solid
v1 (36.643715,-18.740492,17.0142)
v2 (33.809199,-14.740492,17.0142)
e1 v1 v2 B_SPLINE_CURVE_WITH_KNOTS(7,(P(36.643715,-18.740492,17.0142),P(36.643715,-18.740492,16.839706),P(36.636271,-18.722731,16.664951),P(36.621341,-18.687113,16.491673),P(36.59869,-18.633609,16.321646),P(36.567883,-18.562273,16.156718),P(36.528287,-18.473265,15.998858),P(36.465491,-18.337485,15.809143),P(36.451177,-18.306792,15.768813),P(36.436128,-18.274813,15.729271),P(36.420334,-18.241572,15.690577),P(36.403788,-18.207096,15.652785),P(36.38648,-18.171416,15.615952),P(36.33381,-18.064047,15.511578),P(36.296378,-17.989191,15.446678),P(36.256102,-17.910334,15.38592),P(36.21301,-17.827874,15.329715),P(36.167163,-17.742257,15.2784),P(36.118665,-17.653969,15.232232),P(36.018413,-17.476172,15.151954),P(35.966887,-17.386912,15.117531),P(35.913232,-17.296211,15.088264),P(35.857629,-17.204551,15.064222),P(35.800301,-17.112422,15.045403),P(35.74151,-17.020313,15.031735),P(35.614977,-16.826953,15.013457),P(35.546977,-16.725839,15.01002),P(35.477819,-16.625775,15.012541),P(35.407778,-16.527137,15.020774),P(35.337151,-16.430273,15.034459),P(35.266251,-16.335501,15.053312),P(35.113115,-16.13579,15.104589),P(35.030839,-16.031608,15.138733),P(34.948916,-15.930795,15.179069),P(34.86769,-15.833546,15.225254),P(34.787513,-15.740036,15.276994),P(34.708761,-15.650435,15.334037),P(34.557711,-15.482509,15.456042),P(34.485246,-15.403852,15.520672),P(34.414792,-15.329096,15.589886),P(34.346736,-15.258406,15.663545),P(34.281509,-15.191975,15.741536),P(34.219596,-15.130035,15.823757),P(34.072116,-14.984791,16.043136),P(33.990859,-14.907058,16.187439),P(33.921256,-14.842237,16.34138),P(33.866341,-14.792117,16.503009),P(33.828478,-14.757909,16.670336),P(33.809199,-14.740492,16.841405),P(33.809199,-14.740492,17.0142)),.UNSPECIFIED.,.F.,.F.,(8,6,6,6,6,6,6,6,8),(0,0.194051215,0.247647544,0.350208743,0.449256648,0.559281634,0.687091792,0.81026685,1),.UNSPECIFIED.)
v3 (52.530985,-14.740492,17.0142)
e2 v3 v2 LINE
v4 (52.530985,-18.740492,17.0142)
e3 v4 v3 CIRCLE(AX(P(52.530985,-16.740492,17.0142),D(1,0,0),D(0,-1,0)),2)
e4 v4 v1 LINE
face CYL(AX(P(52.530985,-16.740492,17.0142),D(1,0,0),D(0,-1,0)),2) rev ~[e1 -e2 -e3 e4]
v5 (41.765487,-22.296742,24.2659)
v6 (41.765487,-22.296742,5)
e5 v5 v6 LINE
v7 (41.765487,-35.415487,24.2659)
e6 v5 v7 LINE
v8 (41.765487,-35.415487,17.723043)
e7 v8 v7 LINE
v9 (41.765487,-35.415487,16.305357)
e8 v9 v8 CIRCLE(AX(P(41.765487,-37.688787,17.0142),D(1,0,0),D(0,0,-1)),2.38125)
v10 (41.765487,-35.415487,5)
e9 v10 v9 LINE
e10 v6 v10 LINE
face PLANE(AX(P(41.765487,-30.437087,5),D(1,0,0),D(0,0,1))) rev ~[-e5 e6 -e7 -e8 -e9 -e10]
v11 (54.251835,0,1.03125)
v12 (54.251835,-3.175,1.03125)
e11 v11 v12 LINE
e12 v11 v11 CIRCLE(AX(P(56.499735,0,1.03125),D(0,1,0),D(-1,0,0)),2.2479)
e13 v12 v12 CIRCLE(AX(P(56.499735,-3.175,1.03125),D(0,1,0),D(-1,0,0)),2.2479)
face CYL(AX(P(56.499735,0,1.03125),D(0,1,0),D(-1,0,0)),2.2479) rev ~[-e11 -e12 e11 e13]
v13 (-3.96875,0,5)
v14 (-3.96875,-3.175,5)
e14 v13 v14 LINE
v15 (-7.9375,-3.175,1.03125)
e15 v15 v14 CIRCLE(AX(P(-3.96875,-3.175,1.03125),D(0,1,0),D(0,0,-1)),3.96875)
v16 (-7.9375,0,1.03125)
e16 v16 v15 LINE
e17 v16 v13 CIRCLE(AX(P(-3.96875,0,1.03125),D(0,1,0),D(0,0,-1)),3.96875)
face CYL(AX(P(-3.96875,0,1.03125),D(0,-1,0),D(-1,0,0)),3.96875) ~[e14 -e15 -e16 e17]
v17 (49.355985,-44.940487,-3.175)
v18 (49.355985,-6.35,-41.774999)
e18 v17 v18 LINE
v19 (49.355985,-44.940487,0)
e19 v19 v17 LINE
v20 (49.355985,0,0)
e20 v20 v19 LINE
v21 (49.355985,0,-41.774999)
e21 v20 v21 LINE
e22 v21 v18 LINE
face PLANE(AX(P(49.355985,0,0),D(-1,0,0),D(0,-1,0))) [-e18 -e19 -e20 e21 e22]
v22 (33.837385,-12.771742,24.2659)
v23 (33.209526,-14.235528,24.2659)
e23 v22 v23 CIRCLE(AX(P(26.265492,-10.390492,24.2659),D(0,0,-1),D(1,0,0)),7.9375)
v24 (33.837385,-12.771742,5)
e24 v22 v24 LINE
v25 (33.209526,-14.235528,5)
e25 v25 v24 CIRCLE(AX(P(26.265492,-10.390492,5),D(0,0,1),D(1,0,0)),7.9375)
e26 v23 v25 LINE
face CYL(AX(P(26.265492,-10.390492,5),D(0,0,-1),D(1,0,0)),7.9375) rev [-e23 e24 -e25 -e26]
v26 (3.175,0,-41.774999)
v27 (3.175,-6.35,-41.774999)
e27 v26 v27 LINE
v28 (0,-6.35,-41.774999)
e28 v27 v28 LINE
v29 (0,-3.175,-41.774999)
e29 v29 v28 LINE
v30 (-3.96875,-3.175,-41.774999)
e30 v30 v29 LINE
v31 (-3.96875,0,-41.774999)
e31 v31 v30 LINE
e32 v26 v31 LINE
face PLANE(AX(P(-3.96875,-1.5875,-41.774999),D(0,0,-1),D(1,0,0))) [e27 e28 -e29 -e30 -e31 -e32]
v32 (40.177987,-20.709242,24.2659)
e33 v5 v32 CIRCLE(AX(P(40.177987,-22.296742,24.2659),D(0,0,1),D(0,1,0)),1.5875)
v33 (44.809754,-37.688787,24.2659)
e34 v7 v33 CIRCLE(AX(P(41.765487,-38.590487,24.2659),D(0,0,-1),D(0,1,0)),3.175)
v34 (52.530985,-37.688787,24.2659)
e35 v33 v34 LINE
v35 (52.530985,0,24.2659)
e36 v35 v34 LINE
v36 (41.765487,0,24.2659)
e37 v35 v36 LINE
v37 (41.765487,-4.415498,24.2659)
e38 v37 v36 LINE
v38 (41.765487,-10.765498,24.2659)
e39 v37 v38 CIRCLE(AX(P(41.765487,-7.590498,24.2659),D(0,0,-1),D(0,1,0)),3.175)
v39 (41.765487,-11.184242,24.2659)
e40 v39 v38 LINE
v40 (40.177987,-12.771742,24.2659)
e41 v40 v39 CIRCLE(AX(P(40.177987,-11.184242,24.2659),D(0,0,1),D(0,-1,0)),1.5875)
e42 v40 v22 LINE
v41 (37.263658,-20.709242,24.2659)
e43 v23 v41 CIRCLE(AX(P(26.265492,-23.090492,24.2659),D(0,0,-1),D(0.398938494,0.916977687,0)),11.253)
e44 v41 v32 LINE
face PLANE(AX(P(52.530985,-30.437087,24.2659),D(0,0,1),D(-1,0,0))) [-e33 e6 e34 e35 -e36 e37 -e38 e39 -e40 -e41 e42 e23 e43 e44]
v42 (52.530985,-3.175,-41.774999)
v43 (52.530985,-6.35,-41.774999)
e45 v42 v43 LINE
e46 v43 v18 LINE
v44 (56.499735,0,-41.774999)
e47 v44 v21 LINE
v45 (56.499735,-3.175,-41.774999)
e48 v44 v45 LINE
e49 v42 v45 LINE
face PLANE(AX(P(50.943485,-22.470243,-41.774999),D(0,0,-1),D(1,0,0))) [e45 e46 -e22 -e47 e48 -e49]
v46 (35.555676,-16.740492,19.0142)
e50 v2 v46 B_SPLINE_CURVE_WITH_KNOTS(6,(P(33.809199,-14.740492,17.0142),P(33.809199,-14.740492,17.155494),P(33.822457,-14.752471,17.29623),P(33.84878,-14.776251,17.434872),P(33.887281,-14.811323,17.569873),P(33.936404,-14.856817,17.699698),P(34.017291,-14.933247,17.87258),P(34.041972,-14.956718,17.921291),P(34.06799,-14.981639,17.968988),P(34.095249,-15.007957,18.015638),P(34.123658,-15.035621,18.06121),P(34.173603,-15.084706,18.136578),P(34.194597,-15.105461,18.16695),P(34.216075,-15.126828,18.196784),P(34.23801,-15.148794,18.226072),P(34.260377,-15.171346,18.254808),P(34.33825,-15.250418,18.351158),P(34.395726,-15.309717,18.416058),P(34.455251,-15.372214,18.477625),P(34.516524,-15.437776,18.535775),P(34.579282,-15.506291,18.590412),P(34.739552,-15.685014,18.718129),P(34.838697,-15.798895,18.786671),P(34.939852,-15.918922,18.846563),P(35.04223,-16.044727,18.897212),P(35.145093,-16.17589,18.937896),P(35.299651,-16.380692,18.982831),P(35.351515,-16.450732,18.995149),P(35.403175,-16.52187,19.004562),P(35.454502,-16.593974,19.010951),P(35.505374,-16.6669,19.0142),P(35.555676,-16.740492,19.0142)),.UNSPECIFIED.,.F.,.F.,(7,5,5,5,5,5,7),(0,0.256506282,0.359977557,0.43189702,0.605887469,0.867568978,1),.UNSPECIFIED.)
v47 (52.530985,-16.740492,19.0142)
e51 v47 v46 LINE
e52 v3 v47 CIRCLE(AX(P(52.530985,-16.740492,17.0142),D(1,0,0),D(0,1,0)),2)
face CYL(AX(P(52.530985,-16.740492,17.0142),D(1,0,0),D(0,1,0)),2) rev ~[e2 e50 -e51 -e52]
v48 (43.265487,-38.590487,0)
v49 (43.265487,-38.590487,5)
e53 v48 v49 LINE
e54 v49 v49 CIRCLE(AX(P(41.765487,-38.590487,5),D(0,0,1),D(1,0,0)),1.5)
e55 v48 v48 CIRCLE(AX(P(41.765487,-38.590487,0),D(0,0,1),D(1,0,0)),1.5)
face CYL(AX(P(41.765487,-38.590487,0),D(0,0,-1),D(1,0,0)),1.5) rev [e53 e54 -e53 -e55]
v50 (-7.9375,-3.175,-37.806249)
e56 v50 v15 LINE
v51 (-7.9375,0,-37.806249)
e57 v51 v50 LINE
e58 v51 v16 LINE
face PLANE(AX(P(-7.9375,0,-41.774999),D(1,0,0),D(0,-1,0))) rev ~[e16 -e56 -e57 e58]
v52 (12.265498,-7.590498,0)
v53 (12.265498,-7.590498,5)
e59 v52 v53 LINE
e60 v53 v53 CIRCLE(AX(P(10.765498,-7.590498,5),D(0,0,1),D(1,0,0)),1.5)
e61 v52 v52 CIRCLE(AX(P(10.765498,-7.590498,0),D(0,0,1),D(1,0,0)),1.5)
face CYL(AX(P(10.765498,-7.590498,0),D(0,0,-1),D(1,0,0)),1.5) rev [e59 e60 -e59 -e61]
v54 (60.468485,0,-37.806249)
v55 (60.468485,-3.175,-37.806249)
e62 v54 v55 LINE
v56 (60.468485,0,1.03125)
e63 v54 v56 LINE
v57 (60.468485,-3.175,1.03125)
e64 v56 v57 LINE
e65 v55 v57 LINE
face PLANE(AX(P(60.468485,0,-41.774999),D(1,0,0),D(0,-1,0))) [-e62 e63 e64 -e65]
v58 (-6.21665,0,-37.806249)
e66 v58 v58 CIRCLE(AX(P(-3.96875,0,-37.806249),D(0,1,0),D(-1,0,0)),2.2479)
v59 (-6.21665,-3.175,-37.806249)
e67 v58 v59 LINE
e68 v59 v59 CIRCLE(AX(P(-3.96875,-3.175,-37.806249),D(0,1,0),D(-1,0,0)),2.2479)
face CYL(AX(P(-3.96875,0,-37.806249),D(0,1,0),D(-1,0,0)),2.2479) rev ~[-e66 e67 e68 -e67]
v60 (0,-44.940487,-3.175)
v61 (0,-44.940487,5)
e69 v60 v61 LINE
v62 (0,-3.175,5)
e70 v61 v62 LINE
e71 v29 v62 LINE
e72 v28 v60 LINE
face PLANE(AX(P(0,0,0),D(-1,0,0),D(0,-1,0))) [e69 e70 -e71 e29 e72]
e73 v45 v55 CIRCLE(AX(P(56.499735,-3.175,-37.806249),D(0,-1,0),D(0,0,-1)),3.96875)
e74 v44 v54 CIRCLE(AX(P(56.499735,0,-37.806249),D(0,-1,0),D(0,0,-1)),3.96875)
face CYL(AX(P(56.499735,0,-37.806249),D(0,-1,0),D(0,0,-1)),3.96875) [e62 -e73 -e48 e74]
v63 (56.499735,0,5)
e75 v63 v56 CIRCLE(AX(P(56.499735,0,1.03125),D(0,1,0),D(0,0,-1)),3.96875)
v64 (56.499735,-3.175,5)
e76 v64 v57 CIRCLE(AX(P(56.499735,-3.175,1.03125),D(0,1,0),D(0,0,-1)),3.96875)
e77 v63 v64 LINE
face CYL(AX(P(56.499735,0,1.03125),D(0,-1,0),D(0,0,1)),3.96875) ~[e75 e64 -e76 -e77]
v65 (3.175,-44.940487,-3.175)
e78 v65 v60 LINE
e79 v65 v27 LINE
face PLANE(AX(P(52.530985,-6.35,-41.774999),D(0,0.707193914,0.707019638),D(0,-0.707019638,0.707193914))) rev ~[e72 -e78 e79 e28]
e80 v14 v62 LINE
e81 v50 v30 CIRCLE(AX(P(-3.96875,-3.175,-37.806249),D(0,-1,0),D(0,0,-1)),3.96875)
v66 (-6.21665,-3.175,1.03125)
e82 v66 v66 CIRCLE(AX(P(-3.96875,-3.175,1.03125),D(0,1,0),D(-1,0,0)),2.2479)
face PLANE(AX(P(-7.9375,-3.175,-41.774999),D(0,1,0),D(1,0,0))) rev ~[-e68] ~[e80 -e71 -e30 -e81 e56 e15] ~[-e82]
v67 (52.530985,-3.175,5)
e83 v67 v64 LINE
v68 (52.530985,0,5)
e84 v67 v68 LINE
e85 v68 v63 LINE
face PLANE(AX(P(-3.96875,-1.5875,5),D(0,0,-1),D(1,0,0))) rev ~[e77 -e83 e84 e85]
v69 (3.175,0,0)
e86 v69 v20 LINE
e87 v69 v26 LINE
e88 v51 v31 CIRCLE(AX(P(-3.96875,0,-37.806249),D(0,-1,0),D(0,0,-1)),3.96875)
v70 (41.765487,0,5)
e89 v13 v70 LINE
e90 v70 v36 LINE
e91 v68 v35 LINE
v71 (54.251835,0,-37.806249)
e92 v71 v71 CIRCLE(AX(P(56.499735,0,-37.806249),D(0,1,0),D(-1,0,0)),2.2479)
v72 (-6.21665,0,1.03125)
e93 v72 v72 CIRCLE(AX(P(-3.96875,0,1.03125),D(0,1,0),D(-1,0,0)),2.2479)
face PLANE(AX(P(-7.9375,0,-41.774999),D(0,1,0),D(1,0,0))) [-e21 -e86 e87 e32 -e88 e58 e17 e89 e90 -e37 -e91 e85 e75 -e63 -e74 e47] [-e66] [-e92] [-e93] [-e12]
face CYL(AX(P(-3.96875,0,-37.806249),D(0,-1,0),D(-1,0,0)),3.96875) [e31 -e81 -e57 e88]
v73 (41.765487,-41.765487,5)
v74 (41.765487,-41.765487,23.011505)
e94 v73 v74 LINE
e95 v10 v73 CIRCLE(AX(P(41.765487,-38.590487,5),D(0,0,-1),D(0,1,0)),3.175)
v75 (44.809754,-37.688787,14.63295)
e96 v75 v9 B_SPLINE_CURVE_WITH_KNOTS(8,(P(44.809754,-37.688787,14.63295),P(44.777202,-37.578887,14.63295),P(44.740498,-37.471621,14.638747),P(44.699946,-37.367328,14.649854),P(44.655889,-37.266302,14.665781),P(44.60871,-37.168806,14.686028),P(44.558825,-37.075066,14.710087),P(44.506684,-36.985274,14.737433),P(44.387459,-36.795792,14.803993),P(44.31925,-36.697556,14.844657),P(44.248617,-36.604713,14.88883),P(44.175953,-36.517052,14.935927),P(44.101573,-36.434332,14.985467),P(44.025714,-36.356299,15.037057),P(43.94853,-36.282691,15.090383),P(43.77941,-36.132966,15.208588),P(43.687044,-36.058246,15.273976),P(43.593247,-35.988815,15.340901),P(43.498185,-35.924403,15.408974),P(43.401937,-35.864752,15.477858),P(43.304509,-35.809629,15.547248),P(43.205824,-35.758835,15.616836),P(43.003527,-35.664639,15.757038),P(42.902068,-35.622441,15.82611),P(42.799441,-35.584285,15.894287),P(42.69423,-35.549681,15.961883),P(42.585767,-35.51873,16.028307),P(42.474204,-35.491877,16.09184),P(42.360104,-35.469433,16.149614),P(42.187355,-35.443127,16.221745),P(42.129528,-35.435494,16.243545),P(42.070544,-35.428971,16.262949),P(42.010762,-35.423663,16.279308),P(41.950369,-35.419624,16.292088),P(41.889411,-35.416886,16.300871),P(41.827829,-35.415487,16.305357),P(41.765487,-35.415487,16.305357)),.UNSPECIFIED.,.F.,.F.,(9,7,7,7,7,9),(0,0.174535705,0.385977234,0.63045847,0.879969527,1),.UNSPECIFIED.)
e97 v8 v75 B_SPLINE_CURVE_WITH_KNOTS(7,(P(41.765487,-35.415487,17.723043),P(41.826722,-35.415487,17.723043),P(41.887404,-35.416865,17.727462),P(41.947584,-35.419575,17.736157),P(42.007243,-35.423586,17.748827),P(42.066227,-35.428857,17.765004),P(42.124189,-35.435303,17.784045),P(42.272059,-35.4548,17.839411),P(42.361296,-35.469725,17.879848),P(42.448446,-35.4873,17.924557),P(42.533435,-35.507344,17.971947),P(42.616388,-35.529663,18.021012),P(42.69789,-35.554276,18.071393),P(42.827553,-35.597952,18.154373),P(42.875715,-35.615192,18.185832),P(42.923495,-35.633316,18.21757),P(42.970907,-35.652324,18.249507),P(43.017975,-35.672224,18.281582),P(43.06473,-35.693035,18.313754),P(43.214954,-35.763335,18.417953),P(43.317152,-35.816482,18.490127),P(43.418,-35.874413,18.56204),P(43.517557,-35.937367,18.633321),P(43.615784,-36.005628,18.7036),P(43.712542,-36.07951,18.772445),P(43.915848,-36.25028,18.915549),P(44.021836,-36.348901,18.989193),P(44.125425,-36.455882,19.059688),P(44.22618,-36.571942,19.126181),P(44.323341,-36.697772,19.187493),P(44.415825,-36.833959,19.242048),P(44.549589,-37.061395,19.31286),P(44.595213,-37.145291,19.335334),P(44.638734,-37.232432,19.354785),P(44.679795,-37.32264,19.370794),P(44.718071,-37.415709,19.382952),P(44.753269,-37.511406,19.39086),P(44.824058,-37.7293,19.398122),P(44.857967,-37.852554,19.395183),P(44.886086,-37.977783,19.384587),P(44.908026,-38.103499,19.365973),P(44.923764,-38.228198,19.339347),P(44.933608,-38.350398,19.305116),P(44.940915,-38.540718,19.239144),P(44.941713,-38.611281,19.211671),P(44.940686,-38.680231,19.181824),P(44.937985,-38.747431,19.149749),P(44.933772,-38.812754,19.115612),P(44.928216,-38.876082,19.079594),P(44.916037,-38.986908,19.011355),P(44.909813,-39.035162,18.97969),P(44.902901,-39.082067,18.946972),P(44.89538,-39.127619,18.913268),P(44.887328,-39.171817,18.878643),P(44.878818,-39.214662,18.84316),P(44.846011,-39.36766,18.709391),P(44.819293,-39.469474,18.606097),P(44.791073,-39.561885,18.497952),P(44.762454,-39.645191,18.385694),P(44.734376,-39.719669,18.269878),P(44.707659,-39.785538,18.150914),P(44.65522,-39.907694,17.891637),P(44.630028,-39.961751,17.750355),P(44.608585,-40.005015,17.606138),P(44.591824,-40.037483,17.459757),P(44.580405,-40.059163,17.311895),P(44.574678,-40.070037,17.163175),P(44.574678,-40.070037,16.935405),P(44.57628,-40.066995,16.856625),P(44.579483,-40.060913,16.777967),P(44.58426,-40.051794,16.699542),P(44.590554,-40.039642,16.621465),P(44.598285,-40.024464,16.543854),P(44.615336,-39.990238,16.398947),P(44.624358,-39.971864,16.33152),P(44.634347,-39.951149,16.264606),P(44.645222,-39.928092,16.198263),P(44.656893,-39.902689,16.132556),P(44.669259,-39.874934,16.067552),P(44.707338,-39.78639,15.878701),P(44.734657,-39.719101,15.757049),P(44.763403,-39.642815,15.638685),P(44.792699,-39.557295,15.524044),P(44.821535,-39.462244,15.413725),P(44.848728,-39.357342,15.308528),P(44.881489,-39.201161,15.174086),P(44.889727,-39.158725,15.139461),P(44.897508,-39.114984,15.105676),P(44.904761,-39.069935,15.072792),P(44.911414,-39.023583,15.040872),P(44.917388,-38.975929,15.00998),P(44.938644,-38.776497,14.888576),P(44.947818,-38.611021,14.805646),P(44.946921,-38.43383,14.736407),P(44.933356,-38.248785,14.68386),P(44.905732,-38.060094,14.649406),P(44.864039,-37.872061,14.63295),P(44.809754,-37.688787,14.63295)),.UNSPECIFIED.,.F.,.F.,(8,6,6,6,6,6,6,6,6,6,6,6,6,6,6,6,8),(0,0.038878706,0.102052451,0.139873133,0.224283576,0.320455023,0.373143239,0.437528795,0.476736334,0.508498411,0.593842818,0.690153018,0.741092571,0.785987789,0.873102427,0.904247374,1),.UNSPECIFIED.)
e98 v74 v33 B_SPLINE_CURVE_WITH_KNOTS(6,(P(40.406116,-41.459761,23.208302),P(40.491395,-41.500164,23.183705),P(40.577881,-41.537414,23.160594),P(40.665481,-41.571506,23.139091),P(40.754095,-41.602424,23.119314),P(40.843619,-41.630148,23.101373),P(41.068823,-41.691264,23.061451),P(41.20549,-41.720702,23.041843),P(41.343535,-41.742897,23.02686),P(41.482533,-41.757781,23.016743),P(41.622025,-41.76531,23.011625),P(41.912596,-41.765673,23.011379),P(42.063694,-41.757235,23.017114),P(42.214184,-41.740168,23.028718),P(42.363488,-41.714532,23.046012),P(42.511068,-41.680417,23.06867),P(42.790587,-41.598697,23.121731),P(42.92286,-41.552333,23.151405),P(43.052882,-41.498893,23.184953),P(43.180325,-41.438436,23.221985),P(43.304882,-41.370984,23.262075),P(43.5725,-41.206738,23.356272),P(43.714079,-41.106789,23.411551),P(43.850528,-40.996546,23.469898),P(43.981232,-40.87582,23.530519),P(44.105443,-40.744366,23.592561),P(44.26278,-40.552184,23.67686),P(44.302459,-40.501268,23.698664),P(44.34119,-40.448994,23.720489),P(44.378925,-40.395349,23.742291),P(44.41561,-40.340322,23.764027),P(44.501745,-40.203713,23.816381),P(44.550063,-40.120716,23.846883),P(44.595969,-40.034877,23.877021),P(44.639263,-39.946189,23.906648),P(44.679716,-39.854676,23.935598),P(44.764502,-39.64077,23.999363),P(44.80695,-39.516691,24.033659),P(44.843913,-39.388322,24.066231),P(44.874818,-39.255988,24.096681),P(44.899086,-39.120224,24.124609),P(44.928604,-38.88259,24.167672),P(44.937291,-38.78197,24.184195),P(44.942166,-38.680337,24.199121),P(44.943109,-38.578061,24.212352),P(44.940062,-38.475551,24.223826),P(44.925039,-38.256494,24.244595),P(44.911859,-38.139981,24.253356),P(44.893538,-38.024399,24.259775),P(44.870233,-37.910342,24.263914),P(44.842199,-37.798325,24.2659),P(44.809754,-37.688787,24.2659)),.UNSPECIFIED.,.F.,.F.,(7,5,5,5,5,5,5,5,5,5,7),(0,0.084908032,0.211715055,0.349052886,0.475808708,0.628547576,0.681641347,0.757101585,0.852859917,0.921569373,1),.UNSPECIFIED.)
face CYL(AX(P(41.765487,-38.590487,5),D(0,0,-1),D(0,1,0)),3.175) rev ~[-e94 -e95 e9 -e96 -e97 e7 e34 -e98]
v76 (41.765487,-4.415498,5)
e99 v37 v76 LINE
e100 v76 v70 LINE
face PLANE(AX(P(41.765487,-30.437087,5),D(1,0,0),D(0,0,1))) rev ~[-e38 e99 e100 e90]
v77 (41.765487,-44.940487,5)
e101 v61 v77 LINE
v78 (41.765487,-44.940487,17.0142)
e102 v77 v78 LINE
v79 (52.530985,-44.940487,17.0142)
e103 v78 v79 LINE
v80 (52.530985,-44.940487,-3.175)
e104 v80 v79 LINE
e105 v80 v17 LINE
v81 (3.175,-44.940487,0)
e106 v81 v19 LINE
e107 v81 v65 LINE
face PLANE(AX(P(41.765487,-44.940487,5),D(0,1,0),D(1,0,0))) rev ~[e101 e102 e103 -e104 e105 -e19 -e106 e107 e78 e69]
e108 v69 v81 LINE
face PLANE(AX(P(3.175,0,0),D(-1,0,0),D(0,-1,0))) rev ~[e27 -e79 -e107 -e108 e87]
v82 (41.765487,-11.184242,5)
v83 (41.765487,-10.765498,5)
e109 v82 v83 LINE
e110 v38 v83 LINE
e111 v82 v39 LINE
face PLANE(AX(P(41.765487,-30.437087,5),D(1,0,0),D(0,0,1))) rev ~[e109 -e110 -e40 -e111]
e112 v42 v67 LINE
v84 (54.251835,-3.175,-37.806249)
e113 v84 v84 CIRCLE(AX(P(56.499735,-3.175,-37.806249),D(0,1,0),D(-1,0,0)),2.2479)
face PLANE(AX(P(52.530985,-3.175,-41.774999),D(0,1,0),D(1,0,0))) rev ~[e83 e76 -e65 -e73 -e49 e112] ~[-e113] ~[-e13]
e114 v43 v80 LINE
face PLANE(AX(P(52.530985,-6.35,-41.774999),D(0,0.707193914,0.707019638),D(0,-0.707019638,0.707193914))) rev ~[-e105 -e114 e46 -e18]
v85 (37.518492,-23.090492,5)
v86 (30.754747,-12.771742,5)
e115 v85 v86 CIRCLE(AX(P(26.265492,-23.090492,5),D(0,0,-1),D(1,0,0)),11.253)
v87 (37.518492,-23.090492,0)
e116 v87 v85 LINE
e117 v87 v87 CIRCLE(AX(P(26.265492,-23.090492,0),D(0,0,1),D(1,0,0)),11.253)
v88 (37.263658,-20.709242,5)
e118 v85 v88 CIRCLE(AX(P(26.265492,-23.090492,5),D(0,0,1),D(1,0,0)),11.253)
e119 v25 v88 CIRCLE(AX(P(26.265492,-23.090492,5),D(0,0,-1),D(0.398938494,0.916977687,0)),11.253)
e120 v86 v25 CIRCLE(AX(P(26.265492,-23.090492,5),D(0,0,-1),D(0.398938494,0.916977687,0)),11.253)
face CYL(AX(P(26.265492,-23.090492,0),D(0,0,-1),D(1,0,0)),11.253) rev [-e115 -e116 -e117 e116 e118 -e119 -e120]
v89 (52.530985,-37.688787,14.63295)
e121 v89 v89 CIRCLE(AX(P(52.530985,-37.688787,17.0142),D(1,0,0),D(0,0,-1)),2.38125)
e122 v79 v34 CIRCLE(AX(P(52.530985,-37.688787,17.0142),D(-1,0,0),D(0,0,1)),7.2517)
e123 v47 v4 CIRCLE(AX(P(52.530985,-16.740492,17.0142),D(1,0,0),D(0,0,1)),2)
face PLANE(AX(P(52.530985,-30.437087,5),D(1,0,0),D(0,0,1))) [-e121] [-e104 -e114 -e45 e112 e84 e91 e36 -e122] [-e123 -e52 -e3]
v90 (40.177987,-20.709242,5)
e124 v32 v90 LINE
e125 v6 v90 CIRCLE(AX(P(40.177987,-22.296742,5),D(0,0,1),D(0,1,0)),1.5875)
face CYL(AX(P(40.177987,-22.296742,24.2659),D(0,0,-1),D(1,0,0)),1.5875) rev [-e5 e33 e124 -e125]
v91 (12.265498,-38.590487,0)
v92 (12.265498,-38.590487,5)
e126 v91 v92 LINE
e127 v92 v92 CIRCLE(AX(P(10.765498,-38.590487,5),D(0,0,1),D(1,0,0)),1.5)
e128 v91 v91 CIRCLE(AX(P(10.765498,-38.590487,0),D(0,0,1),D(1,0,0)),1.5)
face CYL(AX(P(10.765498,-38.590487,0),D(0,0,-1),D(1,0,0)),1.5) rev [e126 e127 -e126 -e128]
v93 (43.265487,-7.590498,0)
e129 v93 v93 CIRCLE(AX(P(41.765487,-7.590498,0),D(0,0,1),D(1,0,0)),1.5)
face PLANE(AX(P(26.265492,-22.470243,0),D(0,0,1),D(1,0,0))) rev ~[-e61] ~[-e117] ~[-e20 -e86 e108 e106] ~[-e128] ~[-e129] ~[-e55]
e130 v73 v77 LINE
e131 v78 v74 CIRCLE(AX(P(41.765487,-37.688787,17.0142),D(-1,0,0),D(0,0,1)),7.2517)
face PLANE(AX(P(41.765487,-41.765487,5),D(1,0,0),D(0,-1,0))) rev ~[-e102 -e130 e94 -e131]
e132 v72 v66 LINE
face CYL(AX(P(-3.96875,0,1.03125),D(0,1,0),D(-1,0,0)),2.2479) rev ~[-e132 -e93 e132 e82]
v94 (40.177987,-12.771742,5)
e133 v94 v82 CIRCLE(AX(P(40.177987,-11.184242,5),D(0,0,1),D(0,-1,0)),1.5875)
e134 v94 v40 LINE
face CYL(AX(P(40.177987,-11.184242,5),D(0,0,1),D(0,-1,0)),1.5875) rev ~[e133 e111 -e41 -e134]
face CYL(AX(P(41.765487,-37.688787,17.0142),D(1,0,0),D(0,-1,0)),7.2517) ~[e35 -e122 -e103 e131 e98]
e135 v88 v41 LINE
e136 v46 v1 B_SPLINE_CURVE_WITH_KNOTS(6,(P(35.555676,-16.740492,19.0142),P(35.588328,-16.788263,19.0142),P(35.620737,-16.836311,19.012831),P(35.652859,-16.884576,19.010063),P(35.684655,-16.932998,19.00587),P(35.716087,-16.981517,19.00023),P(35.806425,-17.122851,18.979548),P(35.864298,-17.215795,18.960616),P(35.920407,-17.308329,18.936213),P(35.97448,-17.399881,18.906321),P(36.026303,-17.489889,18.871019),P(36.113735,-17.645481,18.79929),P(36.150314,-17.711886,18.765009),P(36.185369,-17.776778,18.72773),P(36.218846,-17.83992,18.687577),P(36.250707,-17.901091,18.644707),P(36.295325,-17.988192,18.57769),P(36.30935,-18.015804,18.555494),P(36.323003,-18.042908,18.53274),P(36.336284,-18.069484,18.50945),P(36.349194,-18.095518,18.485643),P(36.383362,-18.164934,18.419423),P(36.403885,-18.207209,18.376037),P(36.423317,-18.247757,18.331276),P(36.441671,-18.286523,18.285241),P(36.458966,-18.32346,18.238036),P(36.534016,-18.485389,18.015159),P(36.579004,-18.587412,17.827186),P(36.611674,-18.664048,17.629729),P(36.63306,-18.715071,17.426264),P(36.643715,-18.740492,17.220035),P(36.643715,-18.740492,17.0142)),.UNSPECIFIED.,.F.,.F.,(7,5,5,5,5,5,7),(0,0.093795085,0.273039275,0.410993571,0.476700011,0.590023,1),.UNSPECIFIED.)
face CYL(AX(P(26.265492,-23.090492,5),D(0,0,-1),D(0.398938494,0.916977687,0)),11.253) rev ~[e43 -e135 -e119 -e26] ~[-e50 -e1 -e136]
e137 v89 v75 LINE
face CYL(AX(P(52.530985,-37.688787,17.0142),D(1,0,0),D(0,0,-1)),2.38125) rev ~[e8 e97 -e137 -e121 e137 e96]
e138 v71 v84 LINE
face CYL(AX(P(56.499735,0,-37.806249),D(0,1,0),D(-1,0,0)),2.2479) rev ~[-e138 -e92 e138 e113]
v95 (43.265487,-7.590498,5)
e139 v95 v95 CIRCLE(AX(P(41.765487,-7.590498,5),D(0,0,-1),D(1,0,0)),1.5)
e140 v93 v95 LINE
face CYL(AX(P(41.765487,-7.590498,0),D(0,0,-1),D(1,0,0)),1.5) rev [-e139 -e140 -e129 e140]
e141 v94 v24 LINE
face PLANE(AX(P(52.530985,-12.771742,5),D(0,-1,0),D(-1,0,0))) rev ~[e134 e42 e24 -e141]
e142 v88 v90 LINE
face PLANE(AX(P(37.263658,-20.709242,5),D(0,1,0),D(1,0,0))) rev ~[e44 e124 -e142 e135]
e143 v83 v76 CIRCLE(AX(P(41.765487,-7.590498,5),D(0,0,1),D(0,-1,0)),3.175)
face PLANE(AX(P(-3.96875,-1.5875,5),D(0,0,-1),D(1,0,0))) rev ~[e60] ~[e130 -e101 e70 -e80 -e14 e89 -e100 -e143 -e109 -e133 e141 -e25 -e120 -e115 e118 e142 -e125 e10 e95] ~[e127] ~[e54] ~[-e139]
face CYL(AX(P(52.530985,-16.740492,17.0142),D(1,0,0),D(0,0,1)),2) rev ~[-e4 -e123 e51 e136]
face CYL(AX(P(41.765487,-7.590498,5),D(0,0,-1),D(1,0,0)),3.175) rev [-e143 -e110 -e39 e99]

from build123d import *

# Parameters (mm, degrees)
F0_W      = 52.5309846
F0_H      = 44.9404867
F0_R      = 1.5
F0_R_2    = 11.2530001
F1_DEPTH  = 5
F2_W      = 3.175
F2_H      = 44.9404867
F3_DEPTH  = 41.774999
F4_W      = 7.9375
F4_H      = 3.175
F5_DEPTH  = 46.774999
F6_R      = 3.96875
F7_R      = 2.2479
F8_DEPTH  = 3.175
F10_DEPTH = 52.5309846
F12_DEPTH = 19.2659
F14_DEPTH = 10.7654979
F15_R     = 7.9375
F16_DEPTH = 25.4
F17_DEPTH = 30.4370867
F18_R     = 3.175
F19_DEPTH = 19.2659
F21_DEPTH = 133
F22_R     = 7.2517
F23_R     = 1.5875


# Not quite as in the source:
# - an extrude ends at something that could not be found from the text; its depth is read off the source's solid
# - a feature names something its author has since deleted; it is built from what else it names


with BuildPart() as f1:
    # F0 (on Top) → F1 (new body)
    with BuildSketch(Plane.XY):
        with Locations((26.2654923, -22.47024335)):
            Rectangle(F0_W, F0_H)
        with Locations((10.7654979, -38.5904867)):
            Circle(F0_R, mode=Mode.SUBTRACT)
        with Locations((26.2654923, -23.0904923)):
            Circle(F0_R_2, mode=Mode.SUBTRACT)
        with Locations((41.7654867, -38.5904867)):
            Circle(F0_R, mode=Mode.SUBTRACT)
        with Locations((10.7654979, -7.5904979)):
            Circle(F0_R, mode=Mode.SUBTRACT)
        with Locations((41.7654867, -7.5904979)):
            Circle(F0_R, mode=Mode.SUBTRACT)
    extrude(amount=F1_DEPTH)

    # F2 (on face) → F3 (join)
    with BuildSketch(Plane(origin=(0, 0, 0), x_dir=(1, 0, 0), z_dir=(0, 0, -1))):
        with Locations((1.5875, 22.47024335)):
            Rectangle(F2_W, F2_H)
        with Locations((50.9434846, 22.47024335)):
            Rectangle(F2_W, F2_H)
    extrude(amount=F3_DEPTH)

    # F4 (on face) → F5 (join, through all)
    with BuildSketch(Plane(origin=(0, 0, -41.774999), x_dir=(1, 0, 0), z_dir=(0, 0, -1))):
        with Locations((-3.96875, 1.5875)):
            Rectangle(F4_W, F4_H)
        with Locations((56.4997346, 1.5875)):
            Rectangle(F4_W, F4_H)
    extrude(amount=-F5_DEPTH)

    # F6
    f6_edges = [f1.edges().sort_by_distance(p)[0] for p in [
        (60.468485, -1.5875, -41.774999),
        (60.468485, -1.5875, 5),
        (-7.9375, -1.5875, 5),
        (-7.9375, -1.5875, -41.774999),
    ]]
    fillet(f6_edges, radius=F6_R)

    # F7 (on face) → F8 (cut, through all)
    with BuildSketch(Plane(origin=(0, 0, 0), x_dir=(-1, 0, 0), z_dir=(0, 1, 0))):
        with Locations((3.96875, -37.806249)):
            Circle(F7_R)
        with Locations((3.96875, 1.03125)):
            Circle(F7_R)
        with Locations((-56.4997346, 1.03125)):
            Circle(F7_R)
        with Locations((-56.4997346, -37.806249)):
            Circle(F7_R)
    extrude(amount=-F8_DEPTH, mode=Mode.SUBTRACT)

    # F9 (on face) → F10 (cut, through all)
    with BuildSketch(Plane.YZ.offset(52.5309846)):
        Polygon((-44.9404867, -3.175), (-44.9404867, -41.774999), (-6.35, -41.774999), align=None)
    extrude(amount=-F10_DEPTH, mode=Mode.SUBTRACT)

    # F11 (on face) → F12 (join)
    with BuildSketch(Plane.XY.offset(5)):
        with BuildLine():
            Line((41.7654867, -44.9404867), (52.5309846, -44.9404867))
            Line((52.5309846, -44.9404867), (52.5309846, -30.4370867))
            Line((52.5309846, -30.4370867), (41.7654867, -30.4370867))
            Line((41.7654867, -30.4370867), (41.7654867, -35.4154867))
            ThreePointArc((41.7654867, -35.4154867), (44.9404867, -38.5904867), (41.7654867, -41.7654867))
            Line((41.7654867, -41.7654867), (41.7654867, -44.9404867))
        make_face()
        with BuildLine():
            Line((52.5309846, -20.7092423), (52.5309846, -12.7717423))
            Line((52.5309846, -12.7717423), (30.7547472146, -12.7717423))
            ThreePointArc((30.7547472146, -12.7717423), (34.966988133, -15.9550889113), (37.2636584966, -20.7092423))
            Line((37.2636584966, -20.7092423), (52.5309846, -20.7092423))
        make_face()
    extrude(amount=F12_DEPTH)

    # F13 (on face) → F14 (cut, through all)
    with BuildSketch(Plane.YZ.offset(52.5309846)):
        with BuildLine():
            Line((-40.0700367, 17.0142), (-37.6887867, 17.0142))
            Line((-37.6887867, 17.0142), (-37.6887867, 14.63295))
            ThreePointArc((-37.6887867, 14.63295), (-36.0049886773, 15.3304019773), (-35.3075367, 17.0142))
            ThreePointArc((-35.3075367, 17.0142), (-37.6887867, 19.39545), (-40.0700367, 17.0142))
        make_face()
        with BuildLine():
            Line((-37.6887867, 14.63295), (-37.6887867, 17.0142))
            Line((-37.6887867, 17.0142), (-40.0700367, 17.0142))
            ThreePointArc((-40.0700367, 17.0142), (-39.3725847227, 15.3304019773), (-37.6887867, 14.63295))
        make_face()
    extrude(amount=-F14_DEPTH, mode=Mode.SUBTRACT)

    # F15 (on face) → F16 (cut)
    with BuildSketch(Plane.XY.offset(5)):
        with Locations((26.2654923, -10.3904923)):
            Circle(F15_R)
    extrude(amount=F16_DEPTH, mode=Mode.SUBTRACT)

    # F17 (add, through all): a face of the model
    f17_faces = [f1.faces().sort_by_distance(p)[0] for p in [
        (47.14823565, -30.4370867, 14.63295),
    ]]
    extrude(f17_faces, amount=F17_DEPTH)

    # F18 (on face) → F19 (cut, through all)
    with BuildSketch(Plane.XY.offset(5)):
        with Locations((41.7654867, -7.5904979)):
            Circle(F18_R)
    extrude(amount=F19_DEPTH, mode=Mode.SUBTRACT)

    # F20 (on face) → F21 (cut, through all)
    with BuildSketch(Plane.YZ.offset(52.5309846)):
        with BuildLine():
            ThreePointArc((-16.7404923, 19.0142), (-18.1547058624, 18.4284135624), (-18.7404923, 17.0142))
            Line((-18.7404923, 17.0142), (-16.7404923, 17.0142))
            Line((-16.7404923, 17.0142), (-16.7404923, 19.0142))
        make_face()
        with BuildLine():
            Line((-16.7404923, 17.0142), (-18.7404923, 17.0142))
            ThreePointArc((-18.7404923, 17.0142), (-16.7404923, 15.0142), (-14.7404923, 17.0142))
            ThreePointArc((-14.7404923, 17.0142), (-15.3262787376, 18.4284135624), (-16.7404923, 19.0142))
            Line((-16.7404923, 19.0142), (-16.7404923, 17.0142))
        make_face()
    extrude(amount=-F21_DEPTH, mode=Mode.SUBTRACT)

    # F22
    f22_edges = [f1.edges().sort_by_distance(p)[0] for p in [
        (47.148236, -44.940487, 24.2659),
    ]]
    fillet(f22_edges, radius=F22_R)

    # F23
    f23_edges = [f1.edges().sort_by_distance(p)[0] for p in [
        (41.765487, -20.709242, 14.63295),
        (41.765487, -12.771742, 14.63295),
    ]]
    fillet(f23_edges, radius=F23_R)


solid = f1.part
